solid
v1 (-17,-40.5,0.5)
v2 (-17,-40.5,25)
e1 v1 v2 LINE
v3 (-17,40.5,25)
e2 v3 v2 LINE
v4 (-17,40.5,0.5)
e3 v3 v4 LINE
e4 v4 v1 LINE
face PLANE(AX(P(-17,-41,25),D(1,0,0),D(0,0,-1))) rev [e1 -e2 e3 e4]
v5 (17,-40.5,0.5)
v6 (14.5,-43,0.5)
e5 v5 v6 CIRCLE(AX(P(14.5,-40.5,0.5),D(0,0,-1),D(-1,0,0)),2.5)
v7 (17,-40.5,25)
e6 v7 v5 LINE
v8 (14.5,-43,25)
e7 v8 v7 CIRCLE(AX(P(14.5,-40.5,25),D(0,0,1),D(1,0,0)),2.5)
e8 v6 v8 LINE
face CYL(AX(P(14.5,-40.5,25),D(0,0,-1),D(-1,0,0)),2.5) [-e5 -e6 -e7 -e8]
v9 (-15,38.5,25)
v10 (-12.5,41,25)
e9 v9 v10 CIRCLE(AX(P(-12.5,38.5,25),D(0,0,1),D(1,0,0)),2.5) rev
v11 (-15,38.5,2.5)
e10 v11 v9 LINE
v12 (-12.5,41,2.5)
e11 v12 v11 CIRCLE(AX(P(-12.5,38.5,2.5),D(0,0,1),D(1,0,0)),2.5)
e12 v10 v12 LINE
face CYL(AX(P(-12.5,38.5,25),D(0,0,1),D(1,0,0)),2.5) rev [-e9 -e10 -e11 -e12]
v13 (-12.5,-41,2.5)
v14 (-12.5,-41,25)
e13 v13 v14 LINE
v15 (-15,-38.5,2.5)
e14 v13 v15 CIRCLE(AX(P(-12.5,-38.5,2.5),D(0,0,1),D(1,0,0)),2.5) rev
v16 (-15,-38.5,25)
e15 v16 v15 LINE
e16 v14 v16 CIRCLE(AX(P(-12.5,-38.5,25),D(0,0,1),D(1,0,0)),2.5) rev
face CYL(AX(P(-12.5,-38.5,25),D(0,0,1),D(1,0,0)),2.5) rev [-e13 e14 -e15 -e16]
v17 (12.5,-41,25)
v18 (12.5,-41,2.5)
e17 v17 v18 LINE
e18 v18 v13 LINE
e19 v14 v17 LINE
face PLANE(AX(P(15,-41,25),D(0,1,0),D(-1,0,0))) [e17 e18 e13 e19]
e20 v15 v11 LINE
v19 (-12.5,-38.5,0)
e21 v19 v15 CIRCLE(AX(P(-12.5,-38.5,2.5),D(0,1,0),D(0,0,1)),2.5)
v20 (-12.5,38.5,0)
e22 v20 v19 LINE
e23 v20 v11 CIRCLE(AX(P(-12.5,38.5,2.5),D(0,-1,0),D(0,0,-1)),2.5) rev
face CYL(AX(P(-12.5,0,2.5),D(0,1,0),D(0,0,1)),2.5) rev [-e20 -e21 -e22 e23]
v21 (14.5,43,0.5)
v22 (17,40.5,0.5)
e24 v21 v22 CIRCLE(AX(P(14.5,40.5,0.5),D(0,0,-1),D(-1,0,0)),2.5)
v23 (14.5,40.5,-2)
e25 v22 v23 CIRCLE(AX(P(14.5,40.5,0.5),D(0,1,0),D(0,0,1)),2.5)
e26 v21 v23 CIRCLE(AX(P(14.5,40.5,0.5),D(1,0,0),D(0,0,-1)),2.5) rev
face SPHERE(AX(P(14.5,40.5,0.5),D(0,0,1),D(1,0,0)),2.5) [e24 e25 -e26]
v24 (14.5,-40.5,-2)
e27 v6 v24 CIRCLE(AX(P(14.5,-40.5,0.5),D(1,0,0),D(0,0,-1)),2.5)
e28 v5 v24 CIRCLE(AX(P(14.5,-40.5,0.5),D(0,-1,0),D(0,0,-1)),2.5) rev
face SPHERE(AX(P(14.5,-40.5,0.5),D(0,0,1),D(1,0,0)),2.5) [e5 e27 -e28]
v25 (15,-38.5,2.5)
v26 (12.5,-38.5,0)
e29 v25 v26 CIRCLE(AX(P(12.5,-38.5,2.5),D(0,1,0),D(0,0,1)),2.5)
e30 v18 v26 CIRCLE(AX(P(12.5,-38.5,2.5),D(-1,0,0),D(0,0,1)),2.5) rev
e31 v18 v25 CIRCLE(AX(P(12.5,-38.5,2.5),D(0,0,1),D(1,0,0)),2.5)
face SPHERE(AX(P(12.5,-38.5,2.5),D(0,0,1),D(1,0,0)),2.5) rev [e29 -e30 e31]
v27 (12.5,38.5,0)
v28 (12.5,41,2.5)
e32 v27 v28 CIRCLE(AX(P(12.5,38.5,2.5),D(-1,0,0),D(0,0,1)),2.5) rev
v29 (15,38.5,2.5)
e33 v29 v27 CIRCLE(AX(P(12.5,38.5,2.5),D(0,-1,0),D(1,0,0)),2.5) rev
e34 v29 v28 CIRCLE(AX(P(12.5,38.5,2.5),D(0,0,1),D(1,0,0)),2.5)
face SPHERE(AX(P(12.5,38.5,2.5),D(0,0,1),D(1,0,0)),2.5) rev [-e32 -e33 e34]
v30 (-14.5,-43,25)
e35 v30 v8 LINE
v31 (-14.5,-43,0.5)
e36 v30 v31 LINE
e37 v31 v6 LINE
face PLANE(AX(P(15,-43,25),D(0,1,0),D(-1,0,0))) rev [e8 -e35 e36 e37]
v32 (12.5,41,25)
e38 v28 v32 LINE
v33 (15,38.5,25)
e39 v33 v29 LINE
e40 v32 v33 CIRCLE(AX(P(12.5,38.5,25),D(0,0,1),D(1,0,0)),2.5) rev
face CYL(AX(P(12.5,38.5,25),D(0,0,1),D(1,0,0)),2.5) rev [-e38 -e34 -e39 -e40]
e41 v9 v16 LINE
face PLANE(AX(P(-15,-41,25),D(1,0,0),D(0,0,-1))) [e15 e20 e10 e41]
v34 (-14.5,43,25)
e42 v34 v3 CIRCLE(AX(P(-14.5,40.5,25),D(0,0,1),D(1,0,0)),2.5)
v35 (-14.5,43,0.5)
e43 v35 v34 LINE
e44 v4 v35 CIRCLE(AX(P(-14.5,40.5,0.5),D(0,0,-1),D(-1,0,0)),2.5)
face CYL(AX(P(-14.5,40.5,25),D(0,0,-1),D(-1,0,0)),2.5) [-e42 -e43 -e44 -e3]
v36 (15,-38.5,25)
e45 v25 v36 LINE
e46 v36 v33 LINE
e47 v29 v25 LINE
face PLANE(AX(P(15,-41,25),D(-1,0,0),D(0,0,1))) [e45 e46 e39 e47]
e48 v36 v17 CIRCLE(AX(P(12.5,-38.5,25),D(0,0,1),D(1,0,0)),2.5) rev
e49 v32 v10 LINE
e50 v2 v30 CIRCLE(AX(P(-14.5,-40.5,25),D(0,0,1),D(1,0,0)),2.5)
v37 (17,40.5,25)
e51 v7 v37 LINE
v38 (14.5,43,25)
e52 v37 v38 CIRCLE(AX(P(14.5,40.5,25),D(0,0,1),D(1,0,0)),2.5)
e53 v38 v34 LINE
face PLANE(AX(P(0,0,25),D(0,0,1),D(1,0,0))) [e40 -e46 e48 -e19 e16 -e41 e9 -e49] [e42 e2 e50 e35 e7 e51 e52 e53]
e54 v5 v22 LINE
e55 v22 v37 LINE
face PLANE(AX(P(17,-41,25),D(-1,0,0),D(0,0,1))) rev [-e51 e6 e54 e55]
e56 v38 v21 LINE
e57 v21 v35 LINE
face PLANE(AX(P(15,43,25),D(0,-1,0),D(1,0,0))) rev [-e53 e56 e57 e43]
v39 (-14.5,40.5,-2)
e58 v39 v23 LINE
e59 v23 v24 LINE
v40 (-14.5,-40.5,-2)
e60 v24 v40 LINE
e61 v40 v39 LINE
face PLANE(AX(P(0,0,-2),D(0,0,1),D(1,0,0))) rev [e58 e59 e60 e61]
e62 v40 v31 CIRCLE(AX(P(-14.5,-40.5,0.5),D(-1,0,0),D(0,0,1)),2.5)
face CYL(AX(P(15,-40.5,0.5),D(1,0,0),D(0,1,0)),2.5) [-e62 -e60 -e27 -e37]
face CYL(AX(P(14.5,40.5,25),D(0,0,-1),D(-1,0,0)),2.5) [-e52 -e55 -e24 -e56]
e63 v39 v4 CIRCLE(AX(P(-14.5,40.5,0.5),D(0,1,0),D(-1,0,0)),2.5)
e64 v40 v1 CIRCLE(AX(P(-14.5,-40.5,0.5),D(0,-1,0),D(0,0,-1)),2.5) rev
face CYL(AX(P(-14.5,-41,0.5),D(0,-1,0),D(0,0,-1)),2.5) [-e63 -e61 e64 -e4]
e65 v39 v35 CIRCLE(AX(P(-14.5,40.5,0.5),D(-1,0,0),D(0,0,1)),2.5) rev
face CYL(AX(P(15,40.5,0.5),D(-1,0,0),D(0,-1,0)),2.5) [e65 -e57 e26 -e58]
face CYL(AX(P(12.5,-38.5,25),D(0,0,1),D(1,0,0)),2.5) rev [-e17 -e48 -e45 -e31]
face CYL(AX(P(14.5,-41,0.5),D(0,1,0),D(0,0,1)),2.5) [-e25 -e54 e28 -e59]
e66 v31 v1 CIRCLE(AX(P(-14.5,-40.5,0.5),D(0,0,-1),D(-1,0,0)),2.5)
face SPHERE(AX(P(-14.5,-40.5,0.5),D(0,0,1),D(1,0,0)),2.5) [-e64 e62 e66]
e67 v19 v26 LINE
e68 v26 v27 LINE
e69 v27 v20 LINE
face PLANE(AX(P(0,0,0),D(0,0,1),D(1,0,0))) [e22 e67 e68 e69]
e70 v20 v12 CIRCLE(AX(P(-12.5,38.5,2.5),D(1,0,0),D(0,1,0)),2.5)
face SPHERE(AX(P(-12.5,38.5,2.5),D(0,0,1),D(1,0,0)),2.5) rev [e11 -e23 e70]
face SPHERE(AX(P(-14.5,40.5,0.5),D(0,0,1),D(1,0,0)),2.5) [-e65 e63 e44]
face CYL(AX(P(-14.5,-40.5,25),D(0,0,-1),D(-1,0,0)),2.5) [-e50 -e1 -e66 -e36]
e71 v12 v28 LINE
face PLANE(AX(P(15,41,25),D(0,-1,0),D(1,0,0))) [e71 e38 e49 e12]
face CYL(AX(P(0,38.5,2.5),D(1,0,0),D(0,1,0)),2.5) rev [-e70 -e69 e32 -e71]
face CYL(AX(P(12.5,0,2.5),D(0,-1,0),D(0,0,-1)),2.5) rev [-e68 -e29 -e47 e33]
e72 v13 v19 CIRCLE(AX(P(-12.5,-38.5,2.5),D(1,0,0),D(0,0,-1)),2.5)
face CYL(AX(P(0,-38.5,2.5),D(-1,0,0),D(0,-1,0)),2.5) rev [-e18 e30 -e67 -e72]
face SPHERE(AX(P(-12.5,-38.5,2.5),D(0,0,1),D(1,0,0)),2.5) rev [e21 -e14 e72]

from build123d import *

# Parameters (mm, degrees)
ESQUISSE1_W        = 30
ESQUISSE1_H        = 82
BOSS_EXTRU_1_DEPTH = 25
COQUE1_T           = 2
CONG_1_R           = 2.5


with BuildPart() as part:
    # Esquisse1 → Boss.-Extru.1 (new body)
    with BuildSketch(Plane.XY):
        Rectangle(ESQUISSE1_W, ESQUISSE1_H)
    extrude(amount=BOSS_EXTRU_1_DEPTH)

    # Coque1
    coque1_openings = [part.faces().sort_by_distance(p)[0] for p in [
        (0, 0, 25),
    ]]
    offset(amount=COQUE1_T, openings=coque1_openings, kind=Kind.INTERSECTION)

    # Congé1
    # the kernel refuses this fillet: 2.5 mm, written as the material it adds along each edge
    with BuildSketch(Plane(origin=(-12.5, -38.5, 2.5), x_dir=(-1, 0, 0), z_dir=(0, -1, 0))) as cong_1_piece_1_section:
        Polygon((0, 0), (CONG_1_R, 0), (CONG_1_R, CONG_1_R), (0, CONG_1_R), align=None)
    cong_1_piece_1 = extrude(amount=CONG_1_R, mode=Mode.PRIVATE)
    cong_1_piece_1 = cong_1_piece_1 - Plane(origin=(-12.5, -38.5, 2.5), x_dir=(0.7071067811865475, 0, 0.7071067811865475), z_dir=(0, -1, 0)) * Sphere(CONG_1_R, mode=Mode.PRIVATE)
    add(cong_1_piece_1)
    with BuildSketch(Plane(origin=(-12.5, 38.5, 2.5), x_dir=(0, 1, 0), z_dir=(-1, 0, 0))) as cong_1_piece_2_section:
        Polygon((0, 0), (CONG_1_R, 0), (CONG_1_R, CONG_1_R), (0, CONG_1_R), align=None)
    cong_1_piece_2 = extrude(amount=CONG_1_R, mode=Mode.PRIVATE)
    cong_1_piece_2 = cong_1_piece_2 - Plane(origin=(-12.5, 38.5, 2.5), x_dir=(0, -0.7071067811865475, 0.7071067811865475), z_dir=(-1, 0, 0)) * Sphere(CONG_1_R, mode=Mode.PRIVATE)
    add(cong_1_piece_2)
    with BuildSketch(Plane(origin=(12.5, -38.5, 2.5), x_dir=(1, 0, 0), z_dir=(0, -1, 0))) as cong_1_piece_3_section:
        Polygon((0, 0), (CONG_1_R, 0), (CONG_1_R, -CONG_1_R), (0, -CONG_1_R), align=None)
    cong_1_piece_3 = extrude(amount=CONG_1_R, mode=Mode.PRIVATE)
    cong_1_piece_3 = cong_1_piece_3 - Plane(origin=(12.5, -38.5, 2.5), x_dir=(-0.7071067811865475, 0, 0.7071067811865475), z_dir=(0, -1, 0)) * Sphere(CONG_1_R, mode=Mode.PRIVATE)
    add(cong_1_piece_3)
    with BuildSketch(Plane(origin=(12.5, 38.5, 2.5), x_dir=(1, 0, 0), z_dir=(0, 1, 0))) as cong_1_piece_4_section:
        Polygon((0, 0), (CONG_1_R, 0), (CONG_1_R, CONG_1_R), (0, CONG_1_R), align=None)
    cong_1_piece_4 = extrude(amount=CONG_1_R, mode=Mode.PRIVATE)
    cong_1_piece_4 = cong_1_piece_4 - Plane(origin=(12.5, 38.5, 2.5), x_dir=(-0.7071067811865475, 0, 0.7071067811865475), z_dir=(0, 1, 0)) * Sphere(CONG_1_R, mode=Mode.PRIVATE)
    add(cong_1_piece_4)
    with BuildSketch(Plane(origin=(-15, -38.5, 0), x_dir=(0, 0, 1), z_dir=(0, 1, 0)), Plane(origin=(15, 38.5, 0), x_dir=(0, 0, 1), z_dir=(0, -1, 0))) as cong_1_piece_5:
        with BuildLine():
            CenterArc((CONG_1_R, CONG_1_R), CONG_1_R, 180, 90)
            Line((0, CONG_1_R), (0, 0))
            Line((0, 0), (CONG_1_R, 0))
        make_face()
    extrude(amount=77)
    with BuildSketch(Plane(origin=(-15, 41, 2.5), x_dir=(0, -1, 0), z_dir=(0, 0, 1)), Plane(origin=(-15, -41, 2.5), x_dir=(1, 0, 0), z_dir=(0, 0, 1)), Plane(origin=(15, 41, 2.5), x_dir=(-1, 0, 0), z_dir=(0, 0, 1))) as cong_1_piece_6:
        with BuildLine():
            CenterArc((CONG_1_R, CONG_1_R), CONG_1_R, 180, 90)
            Line((0, CONG_1_R), (0, 0))
            Line((0, 0), (CONG_1_R, 0))
        make_face()
    extrude(amount=22.5)
    with BuildSketch(Plane(origin=(12.5, -41, 0), x_dir=(0, 0, 1), z_dir=(-1, 0, 0)), Plane(origin=(-12.5, 41, 0), x_dir=(0, 0, 1), z_dir=(1, 0, 0))) as cong_1_piece_7:
        with BuildLine():
            CenterArc((CONG_1_R, CONG_1_R), CONG_1_R, 180, 90)
            Line((0, CONG_1_R), (0, 0))
            Line((0, 0), (CONG_1_R, 0))
        make_face()
    extrude(amount=25)
    with BuildSketch(Plane(origin=(15, -41, 2.5), x_dir=(-1, 0, 0), z_dir=(0, 0, 1))) as cong_1_piece_8:
        with BuildLine():
            CenterArc((CONG_1_R, -CONG_1_R), CONG_1_R, 90, 90)
            Line((0, -CONG_1_R), (0, 0))
            Line((0, 0), (CONG_1_R, 0))
        make_face()
    extrude(amount=22.5)
    # the kernel refuses this fillet: 2.5 mm, written as the material it takes off along each edge
    with BuildSketch(Plane(origin=(14.5, 40.5, 0.5), x_dir=(0, 0, -1), z_dir=(0, 1, 0))) as cong_1_2_piece_1_section:
        Polygon((0, 0), (CONG_1_R, 0), (CONG_1_R, -CONG_1_R), (0, -CONG_1_R), align=None)
    cong_1_2_piece_1 = extrude(amount=CONG_1_R, mode=Mode.PRIVATE)
    cong_1_2_piece_1 = cong_1_2_piece_1 - Plane(origin=(14.5, 40.5, 0.5), x_dir=(-0.7071067811865475, 0, 0.7071067811865475), z_dir=(0, 1, 0)) * Sphere(CONG_1_R, mode=Mode.PRIVATE)
    add(cong_1_2_piece_1, mode=Mode.SUBTRACT)
    with BuildSketch(Plane(origin=(-14.5, 40.5, 0.5), x_dir=(0, 0, -1), z_dir=(0, 1, 0))) as cong_1_2_piece_2_section:
        Polygon((0, 0), (CONG_1_R, 0), (CONG_1_R, CONG_1_R), (0, CONG_1_R), align=None)
    cong_1_2_piece_2 = extrude(amount=CONG_1_R, mode=Mode.PRIVATE)
    cong_1_2_piece_2 = cong_1_2_piece_2 - Plane(origin=(-14.5, 40.5, 0.5), x_dir=(0.7071067811865475, 0, 0.7071067811865475), z_dir=(0, 1, 0)) * Sphere(CONG_1_R, mode=Mode.PRIVATE)
    add(cong_1_2_piece_2, mode=Mode.SUBTRACT)
    with BuildSketch(Plane(origin=(14.5, -40.5, 0.5), x_dir=(1, 0, 0), z_dir=(0, -1, 0))) as cong_1_2_piece_3_section:
        Polygon((0, 0), (CONG_1_R, 0), (CONG_1_R, -CONG_1_R), (0, -CONG_1_R), align=None)
    cong_1_2_piece_3 = extrude(amount=CONG_1_R, mode=Mode.PRIVATE)
    cong_1_2_piece_3 = cong_1_2_piece_3 - Plane(origin=(14.5, -40.5, 0.5), x_dir=(-0.7071067811865475, 0, 0.7071067811865475), z_dir=(0, -1, 0)) * Sphere(CONG_1_R, mode=Mode.PRIVATE)
    add(cong_1_2_piece_3, mode=Mode.SUBTRACT)
    with BuildSketch(Plane(origin=(-14.5, -40.5, 0.5), x_dir=(0, -1, 0), z_dir=(0, 0, -1))) as cong_1_2_piece_4_section:
        Polygon((0, 0), (CONG_1_R, 0), (CONG_1_R, CONG_1_R), (0, CONG_1_R), align=None)
    cong_1_2_piece_4 = extrude(amount=CONG_1_R, mode=Mode.PRIVATE)
    cong_1_2_piece_4 = cong_1_2_piece_4 - Plane(origin=(-14.5, -40.5, 0.5), x_dir=(0.7071067811865475, 0.7071067811865476, 0), z_dir=(0, 0, -1)) * Sphere(CONG_1_R, mode=Mode.PRIVATE)
    add(cong_1_2_piece_4, mode=Mode.SUBTRACT)
    with BuildSketch(Plane(origin=(14.5, 43, -2), x_dir=(0, 0, 1), z_dir=(-1, 0, 0)), Plane(origin=(-14.5, -43, -2), x_dir=(0, 0, 1), z_dir=(1, 0, 0))) as cong_1_2_piece_5:
        with BuildLine():
            CenterArc((CONG_1_R, -CONG_1_R), CONG_1_R, 90, 90)
            Line((0, -CONG_1_R), (0, 0))
            Line((0, 0), (CONG_1_R, 0))
        make_face()
    extrude(amount=29, mode=Mode.SUBTRACT)
    with BuildSketch(Plane(origin=(17, -40.5, -2), x_dir=(0, 0, 1), z_dir=(0, 1, 0)), Plane(origin=(-17, 40.5, -2), x_dir=(0, 0, 1), z_dir=(0, -1, 0))) as cong_1_2_piece_6:
        with BuildLine():
            CenterArc((CONG_1_R, -CONG_1_R), CONG_1_R, 90, 90)
            Line((0, -CONG_1_R), (0, 0))
            Line((0, 0), (CONG_1_R, 0))
        make_face()
    extrude(amount=81, mode=Mode.SUBTRACT)
    with BuildSketch(Plane(origin=(-17, 43, 31.25), x_dir=(1, 0, 0), z_dir=(0, 0, -1)), Plane(origin=(17, -43, 0.5), x_dir=(0, 1, 0), z_dir=(0, 0, 1))) as cong_1_2_piece_7:
        with BuildLine():
            CenterArc((CONG_1_R, CONG_1_R), CONG_1_R, 180, 90)
            Line((0, CONG_1_R), (0, 0))
            Line((0, 0), (CONG_1_R, 0))
        make_face()
    extrude(amount=30.75, mode=Mode.SUBTRACT)
    with BuildSketch(Plane(origin=(17, 43, 31.25), x_dir=(-1, 0, 0), z_dir=(0, 0, -1)), Plane(origin=(-17, -43, 31.25), x_dir=(1, 0, 0), z_dir=(0, 0, -1))) as cong_1_2_piece_8:
        with BuildLine():
            CenterArc((CONG_1_R, -CONG_1_R), CONG_1_R, 90, 90)
            Line((0, -CONG_1_R), (0, 0))
            Line((0, 0), (CONG_1_R, 0))
        make_face()
    extrude(amount=30.75, mode=Mode.SUBTRACT)


solid = part.part
